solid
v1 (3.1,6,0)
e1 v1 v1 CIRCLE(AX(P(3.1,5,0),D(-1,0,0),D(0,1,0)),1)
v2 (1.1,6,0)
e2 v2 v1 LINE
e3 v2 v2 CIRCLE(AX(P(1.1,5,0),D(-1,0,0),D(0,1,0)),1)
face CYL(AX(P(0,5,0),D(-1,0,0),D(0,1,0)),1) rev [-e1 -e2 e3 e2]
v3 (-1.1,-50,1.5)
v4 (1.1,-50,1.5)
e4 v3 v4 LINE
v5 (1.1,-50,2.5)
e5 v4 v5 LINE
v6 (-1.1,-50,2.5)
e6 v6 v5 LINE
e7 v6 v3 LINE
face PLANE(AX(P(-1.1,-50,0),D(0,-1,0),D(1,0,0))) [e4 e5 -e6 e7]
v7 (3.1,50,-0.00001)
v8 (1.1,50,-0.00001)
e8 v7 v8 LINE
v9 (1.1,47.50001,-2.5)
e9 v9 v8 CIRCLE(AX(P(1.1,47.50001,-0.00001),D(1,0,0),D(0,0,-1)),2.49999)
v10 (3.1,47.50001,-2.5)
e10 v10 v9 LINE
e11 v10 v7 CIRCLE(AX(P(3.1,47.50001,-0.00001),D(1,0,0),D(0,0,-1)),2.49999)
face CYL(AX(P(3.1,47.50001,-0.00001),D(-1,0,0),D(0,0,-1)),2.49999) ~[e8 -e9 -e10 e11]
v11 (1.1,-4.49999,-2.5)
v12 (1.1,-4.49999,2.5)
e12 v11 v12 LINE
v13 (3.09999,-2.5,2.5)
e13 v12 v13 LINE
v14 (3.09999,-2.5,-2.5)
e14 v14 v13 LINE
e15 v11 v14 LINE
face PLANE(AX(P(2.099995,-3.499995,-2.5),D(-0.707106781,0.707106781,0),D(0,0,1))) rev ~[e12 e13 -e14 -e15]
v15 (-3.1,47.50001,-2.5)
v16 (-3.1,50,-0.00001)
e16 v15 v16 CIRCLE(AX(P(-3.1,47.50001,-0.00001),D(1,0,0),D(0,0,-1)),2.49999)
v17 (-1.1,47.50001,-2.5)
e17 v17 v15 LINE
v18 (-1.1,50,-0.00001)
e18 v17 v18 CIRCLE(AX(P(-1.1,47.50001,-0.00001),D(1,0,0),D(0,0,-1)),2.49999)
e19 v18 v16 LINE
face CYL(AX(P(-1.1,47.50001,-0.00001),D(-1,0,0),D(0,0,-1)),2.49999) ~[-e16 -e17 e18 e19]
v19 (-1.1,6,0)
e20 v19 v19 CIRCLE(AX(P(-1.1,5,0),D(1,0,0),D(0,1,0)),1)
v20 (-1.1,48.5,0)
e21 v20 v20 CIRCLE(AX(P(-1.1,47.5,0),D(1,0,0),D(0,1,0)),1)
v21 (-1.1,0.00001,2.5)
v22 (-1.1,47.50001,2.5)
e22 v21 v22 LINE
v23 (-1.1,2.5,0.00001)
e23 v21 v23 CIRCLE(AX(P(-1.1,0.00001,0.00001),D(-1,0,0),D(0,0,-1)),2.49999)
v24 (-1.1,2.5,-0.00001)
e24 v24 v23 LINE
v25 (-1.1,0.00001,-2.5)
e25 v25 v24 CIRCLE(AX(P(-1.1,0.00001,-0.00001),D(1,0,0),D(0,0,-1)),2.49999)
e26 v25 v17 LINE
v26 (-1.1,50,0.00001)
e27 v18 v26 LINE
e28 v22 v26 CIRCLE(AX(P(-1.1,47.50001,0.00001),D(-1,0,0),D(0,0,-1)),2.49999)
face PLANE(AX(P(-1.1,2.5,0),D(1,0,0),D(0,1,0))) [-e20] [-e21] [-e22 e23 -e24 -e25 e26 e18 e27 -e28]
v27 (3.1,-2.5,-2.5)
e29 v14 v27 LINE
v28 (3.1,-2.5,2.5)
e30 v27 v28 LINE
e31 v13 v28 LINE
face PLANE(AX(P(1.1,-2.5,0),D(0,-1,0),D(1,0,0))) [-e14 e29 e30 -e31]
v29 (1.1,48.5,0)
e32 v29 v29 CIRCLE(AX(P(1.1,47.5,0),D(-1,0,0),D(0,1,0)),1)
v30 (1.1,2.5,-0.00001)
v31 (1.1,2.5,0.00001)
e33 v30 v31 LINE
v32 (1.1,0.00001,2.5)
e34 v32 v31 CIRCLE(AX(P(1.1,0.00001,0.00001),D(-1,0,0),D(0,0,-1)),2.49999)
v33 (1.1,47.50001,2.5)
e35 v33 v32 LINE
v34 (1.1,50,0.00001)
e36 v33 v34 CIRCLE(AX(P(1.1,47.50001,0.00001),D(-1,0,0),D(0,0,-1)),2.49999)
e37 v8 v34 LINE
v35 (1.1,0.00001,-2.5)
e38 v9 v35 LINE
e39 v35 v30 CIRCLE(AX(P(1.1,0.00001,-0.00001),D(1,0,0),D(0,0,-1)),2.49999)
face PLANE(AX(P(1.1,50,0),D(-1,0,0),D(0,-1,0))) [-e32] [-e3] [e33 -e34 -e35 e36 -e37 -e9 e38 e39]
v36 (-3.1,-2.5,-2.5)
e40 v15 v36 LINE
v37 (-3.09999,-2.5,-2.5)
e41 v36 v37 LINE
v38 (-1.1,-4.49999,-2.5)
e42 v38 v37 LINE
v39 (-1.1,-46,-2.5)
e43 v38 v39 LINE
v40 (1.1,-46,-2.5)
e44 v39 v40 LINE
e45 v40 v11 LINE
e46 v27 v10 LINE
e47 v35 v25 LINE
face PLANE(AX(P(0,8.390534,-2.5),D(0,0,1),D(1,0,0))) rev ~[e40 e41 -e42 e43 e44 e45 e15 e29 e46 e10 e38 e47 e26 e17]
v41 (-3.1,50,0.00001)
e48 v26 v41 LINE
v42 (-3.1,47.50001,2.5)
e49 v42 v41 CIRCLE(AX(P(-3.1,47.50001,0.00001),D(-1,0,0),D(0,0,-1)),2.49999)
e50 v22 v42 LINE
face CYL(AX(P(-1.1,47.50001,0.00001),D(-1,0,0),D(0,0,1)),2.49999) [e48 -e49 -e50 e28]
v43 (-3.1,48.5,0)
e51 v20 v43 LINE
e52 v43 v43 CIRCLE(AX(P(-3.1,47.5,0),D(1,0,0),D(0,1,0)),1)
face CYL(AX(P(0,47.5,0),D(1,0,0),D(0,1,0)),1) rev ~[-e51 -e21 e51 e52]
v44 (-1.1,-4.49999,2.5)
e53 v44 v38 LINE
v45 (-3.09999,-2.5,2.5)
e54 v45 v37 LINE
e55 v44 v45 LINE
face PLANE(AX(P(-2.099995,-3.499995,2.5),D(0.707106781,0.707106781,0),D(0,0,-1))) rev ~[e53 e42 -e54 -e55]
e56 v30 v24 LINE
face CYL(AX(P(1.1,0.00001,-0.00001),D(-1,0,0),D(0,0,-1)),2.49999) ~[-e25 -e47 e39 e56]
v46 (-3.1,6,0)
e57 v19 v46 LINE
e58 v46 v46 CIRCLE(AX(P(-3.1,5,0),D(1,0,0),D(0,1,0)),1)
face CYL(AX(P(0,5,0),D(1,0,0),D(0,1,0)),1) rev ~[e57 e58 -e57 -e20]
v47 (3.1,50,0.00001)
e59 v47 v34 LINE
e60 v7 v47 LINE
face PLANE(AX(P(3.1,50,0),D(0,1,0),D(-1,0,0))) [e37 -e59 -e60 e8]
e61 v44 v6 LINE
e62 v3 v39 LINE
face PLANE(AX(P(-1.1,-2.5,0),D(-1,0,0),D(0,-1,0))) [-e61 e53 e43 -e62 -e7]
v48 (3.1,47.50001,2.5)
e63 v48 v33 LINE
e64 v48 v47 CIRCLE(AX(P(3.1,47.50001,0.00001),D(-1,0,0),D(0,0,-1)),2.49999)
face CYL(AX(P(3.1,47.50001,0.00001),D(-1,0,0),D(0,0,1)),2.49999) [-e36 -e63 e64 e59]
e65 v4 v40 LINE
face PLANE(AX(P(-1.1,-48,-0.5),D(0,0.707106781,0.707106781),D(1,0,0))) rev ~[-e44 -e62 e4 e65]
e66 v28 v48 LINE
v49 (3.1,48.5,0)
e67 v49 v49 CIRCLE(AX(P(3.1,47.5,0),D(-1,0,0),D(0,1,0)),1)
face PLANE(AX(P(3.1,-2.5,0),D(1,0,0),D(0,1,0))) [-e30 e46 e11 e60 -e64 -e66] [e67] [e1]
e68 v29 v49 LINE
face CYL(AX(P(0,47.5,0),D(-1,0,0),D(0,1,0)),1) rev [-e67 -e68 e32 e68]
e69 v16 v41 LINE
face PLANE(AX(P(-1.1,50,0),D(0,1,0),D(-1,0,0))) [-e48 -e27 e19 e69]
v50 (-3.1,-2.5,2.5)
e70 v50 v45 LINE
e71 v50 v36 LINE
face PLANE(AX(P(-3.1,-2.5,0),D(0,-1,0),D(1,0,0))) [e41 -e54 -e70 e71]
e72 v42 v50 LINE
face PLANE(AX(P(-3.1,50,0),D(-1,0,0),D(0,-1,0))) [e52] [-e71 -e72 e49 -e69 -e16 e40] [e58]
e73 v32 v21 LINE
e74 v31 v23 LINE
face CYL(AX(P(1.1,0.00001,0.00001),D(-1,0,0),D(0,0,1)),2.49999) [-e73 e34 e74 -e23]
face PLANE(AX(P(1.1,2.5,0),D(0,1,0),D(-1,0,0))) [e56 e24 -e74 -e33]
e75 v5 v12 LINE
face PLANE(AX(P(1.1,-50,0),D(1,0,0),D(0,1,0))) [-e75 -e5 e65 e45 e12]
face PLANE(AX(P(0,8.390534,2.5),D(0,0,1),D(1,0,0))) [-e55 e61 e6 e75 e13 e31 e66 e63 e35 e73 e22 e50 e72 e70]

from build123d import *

# Parameters (mm, degrees)
F1_DEPTH      = 2.5
F2_SIZE       = 4
F3_SIZE       = 1.99999
F4_R          = 2.49999
F5_R          = 1
F6_DEPTH      = 3.101
F6_DEPTH_BACK = 3.101


# Not quite as in the source:
# - a fillet or chamfer is up to 0.001 mm smaller than in the source, because OpenCascade refuses the exact size


with BuildPart() as f1:
    # F0 (on Top) → F1 (new body, symmetric)
    with BuildSketch(Plane.XY):
        Polygon((-1.1, -50), (0, -50), (1.1, -50), (1.1, -2.5), (3.1, -2.5), (3.1, 50), (1.1, 50), (1.1, 2.5), (0, 2.5), (-1.1, 2.5), (-1.1, 50), (-3.1, 50), (-3.1, -2.5), (-1.1, -2.5), align=None)
    extrude(amount=F1_DEPTH, both=True)

    # F2
    f2_edges = [f1.edges().sort_by_distance(p)[0] for p in [
        (0, -50, -2.5),
    ]]
    chamfer(f2_edges, length=F2_SIZE)

    # F3 (size 2 in the source; OpenCascade refuses exactly that, so slightly less here)
    f3_edges = [f1.edges().sort_by_distance(p)[0] for p in [
        (1.1, -2.5, 0),
        (-1.1, -2.5, 0),
    ]]
    chamfer(f3_edges, length=F3_SIZE)

    # F4 (radius 2.5 in the source; OpenCascade refuses exactly that, so slightly less here)
    f4_edges = [f1.edges().sort_by_distance(p)[0] for p in [
        (2.1, 50, 2.5),
        (-2.1, 50, 2.5),
        (-2.1, 50, -2.5),
        (2.1, 50, -2.5),
        (0, 2.5, -2.5),
        (0, 2.5, 2.5),
    ]]
    fillet(f4_edges, radius=F4_R)

    # F5 (on Right) → F6 (cut, two sides)
    with BuildSketch(Plane.YZ) as f6_sk:
        with Locations((5, 0)):
            Circle(F5_R)
        with Locations((47.5, 0)):
            Circle(F5_R)
    extrude(amount=-F6_DEPTH, mode=Mode.SUBTRACT)
    extrude(f6_sk.sketch, amount=F6_DEPTH_BACK, mode=Mode.SUBTRACT)


solid = f1.part
